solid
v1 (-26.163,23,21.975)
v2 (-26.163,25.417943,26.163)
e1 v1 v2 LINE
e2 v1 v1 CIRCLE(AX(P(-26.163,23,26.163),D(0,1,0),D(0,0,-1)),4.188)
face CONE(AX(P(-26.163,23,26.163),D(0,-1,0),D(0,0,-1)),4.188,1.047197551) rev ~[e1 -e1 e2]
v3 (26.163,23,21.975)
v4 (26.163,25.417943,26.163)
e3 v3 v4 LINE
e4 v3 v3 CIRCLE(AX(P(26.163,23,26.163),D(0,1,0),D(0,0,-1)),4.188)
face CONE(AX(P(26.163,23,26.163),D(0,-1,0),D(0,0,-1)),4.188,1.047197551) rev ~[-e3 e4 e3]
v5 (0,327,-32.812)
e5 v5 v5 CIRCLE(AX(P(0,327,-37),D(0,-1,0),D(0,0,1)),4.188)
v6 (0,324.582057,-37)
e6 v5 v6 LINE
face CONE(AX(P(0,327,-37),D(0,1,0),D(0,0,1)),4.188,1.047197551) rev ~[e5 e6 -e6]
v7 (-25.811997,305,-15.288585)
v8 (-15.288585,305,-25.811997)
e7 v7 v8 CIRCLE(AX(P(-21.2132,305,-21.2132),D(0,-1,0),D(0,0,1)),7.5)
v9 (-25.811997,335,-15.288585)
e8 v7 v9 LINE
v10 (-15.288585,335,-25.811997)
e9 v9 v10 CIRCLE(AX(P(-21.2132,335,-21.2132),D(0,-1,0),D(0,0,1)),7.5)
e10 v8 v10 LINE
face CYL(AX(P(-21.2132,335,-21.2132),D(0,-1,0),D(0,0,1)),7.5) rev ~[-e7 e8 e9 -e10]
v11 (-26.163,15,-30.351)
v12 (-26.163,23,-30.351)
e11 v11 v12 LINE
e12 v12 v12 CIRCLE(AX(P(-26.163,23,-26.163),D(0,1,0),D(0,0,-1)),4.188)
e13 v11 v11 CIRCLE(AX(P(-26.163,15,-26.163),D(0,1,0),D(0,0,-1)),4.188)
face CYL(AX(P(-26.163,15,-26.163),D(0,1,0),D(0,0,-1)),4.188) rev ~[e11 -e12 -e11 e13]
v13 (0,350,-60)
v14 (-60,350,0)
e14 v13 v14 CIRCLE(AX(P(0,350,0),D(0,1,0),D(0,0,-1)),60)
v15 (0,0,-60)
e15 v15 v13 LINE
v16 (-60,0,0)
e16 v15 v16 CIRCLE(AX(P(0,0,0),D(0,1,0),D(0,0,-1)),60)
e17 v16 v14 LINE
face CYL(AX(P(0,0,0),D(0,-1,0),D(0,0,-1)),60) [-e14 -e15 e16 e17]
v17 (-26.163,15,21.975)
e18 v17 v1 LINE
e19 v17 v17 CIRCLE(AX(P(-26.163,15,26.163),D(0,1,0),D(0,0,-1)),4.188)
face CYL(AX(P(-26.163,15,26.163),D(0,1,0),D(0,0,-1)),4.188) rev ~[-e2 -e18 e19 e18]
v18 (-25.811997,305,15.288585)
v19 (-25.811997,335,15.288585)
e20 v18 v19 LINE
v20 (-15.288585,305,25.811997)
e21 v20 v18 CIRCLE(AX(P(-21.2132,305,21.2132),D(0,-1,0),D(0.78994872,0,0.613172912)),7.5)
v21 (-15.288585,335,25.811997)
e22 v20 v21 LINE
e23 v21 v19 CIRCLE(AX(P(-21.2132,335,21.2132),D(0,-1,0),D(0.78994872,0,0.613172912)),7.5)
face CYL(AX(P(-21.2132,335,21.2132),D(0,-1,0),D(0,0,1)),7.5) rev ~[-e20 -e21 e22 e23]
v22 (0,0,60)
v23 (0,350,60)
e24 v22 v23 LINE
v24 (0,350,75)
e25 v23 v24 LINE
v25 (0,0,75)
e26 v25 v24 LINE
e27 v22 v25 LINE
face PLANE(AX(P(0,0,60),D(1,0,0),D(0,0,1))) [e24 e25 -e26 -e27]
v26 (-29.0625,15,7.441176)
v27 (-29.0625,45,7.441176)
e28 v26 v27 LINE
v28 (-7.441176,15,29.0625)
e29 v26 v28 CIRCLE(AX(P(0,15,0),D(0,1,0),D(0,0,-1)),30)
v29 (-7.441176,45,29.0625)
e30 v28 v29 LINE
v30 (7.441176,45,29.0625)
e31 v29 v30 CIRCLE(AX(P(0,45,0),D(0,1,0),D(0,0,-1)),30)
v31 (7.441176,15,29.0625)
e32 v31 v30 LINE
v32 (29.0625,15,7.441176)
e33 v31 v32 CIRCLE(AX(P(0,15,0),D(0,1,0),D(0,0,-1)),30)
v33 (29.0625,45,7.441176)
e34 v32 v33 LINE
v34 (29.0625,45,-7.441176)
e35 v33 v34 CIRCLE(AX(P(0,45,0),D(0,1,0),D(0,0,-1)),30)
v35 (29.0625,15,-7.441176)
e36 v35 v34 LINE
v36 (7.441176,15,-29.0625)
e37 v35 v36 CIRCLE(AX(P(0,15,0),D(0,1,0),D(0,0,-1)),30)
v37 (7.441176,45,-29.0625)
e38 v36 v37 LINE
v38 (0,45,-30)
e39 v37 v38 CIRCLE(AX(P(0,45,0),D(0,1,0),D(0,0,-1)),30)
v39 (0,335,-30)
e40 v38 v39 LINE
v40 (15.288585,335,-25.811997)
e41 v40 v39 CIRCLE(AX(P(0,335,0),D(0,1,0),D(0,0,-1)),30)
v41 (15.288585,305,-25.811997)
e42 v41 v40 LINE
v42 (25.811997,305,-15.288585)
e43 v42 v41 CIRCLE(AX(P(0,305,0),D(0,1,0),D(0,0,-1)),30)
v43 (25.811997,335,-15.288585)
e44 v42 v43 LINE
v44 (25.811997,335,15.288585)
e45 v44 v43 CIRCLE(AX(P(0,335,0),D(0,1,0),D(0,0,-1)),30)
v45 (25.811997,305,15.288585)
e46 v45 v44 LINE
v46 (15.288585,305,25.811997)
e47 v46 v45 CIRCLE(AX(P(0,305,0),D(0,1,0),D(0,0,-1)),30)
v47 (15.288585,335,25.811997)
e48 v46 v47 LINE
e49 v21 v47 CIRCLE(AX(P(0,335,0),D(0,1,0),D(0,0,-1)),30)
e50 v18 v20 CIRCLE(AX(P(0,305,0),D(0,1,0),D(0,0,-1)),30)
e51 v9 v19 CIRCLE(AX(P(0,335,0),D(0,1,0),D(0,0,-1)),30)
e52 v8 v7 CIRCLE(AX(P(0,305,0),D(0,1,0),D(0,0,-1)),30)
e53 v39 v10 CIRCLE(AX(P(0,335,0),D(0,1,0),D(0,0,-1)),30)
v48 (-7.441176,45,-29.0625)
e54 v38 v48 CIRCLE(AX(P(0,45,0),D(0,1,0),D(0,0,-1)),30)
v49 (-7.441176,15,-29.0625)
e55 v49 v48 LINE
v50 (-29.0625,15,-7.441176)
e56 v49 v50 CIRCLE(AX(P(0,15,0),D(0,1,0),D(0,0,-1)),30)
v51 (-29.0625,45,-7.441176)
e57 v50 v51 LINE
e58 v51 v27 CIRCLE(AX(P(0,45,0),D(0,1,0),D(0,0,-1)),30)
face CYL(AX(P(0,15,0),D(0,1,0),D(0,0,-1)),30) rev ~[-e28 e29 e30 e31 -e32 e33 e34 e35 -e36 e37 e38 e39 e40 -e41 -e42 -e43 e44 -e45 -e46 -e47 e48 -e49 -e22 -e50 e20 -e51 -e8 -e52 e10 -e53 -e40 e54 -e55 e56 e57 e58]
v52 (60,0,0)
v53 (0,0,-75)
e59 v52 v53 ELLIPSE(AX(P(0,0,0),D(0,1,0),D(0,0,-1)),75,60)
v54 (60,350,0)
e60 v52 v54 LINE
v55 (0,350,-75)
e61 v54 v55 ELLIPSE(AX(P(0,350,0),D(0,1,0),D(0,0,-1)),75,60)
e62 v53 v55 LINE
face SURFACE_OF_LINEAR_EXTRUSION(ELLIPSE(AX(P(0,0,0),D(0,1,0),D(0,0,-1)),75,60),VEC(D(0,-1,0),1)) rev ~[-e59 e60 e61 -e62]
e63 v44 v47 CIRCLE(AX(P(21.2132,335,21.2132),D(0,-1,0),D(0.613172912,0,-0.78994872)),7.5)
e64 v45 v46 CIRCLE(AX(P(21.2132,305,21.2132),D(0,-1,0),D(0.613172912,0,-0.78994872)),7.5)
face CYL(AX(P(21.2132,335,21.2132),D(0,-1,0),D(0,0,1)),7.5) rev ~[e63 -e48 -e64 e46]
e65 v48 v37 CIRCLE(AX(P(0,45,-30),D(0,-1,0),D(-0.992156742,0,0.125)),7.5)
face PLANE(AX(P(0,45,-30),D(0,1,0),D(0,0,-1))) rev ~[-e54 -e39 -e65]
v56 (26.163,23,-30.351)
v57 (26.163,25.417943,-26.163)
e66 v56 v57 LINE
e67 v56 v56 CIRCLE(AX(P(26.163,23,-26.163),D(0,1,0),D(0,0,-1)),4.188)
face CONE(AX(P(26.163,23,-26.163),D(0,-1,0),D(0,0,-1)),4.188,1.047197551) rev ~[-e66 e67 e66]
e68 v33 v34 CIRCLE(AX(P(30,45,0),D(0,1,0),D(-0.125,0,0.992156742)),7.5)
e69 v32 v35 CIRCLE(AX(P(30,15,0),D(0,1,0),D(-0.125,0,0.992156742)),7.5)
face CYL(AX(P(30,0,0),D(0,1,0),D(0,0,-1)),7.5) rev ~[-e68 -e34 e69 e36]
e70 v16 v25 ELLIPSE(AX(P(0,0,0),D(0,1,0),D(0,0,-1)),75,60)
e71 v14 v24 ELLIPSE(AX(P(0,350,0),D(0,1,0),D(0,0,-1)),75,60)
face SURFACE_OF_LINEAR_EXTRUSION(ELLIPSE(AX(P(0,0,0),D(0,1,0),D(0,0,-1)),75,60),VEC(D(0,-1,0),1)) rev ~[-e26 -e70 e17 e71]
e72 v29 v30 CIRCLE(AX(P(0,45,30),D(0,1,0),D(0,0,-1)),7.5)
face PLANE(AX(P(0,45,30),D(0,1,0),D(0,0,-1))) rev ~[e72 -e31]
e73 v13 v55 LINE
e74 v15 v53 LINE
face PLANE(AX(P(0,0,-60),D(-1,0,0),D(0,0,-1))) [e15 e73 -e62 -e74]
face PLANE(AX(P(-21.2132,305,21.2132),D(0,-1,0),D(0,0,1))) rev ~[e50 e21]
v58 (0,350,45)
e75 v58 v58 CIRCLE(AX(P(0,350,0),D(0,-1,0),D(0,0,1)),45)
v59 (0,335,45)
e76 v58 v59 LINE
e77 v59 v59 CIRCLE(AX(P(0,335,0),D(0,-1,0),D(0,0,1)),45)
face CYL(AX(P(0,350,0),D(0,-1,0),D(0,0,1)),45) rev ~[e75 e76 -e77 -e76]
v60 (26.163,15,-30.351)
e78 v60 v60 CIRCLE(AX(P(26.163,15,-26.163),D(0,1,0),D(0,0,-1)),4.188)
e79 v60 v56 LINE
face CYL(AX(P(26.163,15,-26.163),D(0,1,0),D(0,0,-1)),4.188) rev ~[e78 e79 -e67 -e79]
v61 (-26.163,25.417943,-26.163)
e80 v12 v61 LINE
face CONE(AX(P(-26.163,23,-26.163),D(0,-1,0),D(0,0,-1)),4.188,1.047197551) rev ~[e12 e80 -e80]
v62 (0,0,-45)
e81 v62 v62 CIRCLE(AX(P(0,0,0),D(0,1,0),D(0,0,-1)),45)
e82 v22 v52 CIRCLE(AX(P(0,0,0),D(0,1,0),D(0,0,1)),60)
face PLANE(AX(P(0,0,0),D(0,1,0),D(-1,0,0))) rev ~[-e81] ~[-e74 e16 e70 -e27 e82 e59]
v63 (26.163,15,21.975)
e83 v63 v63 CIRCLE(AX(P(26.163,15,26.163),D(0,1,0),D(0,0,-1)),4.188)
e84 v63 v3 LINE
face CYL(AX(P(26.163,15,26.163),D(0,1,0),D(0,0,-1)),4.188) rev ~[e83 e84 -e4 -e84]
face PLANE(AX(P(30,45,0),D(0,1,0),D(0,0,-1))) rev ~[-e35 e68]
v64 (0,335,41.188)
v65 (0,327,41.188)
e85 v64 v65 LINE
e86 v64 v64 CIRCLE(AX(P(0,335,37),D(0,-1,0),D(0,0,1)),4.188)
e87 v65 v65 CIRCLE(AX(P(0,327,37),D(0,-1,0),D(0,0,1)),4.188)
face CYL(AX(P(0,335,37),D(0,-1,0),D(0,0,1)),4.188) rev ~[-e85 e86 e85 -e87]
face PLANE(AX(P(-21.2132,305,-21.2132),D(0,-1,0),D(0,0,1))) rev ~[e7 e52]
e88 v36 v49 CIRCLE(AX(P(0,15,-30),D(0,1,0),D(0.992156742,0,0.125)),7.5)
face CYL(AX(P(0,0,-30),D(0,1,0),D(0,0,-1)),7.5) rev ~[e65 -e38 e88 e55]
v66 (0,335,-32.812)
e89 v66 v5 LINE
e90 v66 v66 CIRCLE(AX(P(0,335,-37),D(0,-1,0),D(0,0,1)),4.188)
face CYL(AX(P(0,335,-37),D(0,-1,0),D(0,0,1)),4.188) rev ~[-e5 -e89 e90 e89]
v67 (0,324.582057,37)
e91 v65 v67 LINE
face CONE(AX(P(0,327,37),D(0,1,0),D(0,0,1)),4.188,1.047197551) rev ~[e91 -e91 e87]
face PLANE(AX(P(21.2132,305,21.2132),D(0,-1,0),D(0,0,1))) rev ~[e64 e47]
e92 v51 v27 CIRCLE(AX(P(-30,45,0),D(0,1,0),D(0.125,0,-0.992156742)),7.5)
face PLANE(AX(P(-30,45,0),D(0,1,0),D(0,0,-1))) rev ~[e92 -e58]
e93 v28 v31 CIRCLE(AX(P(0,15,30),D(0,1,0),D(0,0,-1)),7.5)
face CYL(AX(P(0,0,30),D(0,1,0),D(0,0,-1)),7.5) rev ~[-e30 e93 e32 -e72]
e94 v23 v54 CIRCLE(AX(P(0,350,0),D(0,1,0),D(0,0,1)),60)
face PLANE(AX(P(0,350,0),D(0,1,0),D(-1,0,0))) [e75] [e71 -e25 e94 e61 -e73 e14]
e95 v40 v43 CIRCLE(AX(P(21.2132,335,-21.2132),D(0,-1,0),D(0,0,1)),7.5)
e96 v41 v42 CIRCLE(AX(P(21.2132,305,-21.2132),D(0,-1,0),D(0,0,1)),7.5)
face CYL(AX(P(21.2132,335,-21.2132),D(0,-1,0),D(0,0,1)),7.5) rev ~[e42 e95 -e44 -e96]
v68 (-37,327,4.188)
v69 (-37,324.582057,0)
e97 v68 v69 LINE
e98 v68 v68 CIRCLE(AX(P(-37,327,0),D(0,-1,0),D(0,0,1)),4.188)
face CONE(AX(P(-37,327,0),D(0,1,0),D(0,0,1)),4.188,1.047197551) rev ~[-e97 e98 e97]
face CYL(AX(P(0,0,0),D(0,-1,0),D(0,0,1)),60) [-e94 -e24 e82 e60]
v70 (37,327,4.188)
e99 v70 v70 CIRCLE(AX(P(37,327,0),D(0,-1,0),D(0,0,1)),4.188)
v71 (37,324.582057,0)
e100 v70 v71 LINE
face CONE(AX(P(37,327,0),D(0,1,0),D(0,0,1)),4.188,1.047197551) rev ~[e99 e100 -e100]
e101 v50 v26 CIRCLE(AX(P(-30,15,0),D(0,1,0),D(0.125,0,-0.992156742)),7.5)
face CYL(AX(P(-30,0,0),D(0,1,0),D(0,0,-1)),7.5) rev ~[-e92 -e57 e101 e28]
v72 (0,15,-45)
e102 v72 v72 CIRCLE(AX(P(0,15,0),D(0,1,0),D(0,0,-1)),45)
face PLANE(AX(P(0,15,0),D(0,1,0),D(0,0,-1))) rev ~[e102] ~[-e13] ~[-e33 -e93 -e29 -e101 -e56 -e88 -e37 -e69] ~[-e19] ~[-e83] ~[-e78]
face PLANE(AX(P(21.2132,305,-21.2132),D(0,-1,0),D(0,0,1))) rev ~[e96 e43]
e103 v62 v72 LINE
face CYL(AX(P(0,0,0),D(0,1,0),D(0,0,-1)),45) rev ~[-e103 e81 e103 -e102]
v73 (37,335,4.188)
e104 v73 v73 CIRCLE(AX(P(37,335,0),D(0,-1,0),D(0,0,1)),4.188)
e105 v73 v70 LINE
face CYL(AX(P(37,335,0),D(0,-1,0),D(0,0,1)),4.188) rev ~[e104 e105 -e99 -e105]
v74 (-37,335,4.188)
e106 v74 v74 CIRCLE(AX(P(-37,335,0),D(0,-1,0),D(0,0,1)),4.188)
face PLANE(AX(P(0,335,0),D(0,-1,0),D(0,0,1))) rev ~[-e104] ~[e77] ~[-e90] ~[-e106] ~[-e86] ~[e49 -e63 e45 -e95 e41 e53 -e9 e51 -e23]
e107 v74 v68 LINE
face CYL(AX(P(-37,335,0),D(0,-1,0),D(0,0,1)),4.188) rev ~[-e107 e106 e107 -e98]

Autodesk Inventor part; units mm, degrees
ref_plane "YZ Plane" through (0, 0, 0) normal (1, 0, 0) x (0, 1, 0)
ref_plane "XZ Plane" through (0, 0, 0) normal (0, 1, 0) x (-1, 0, 0)
ref_plane "XY Plane" through (0, 0, 0) normal (0, 0, 1) x (1, 0, 0)
sketch "Эскиз1" plane through (0, 0, 0) normal (0, 1, 0) x (-1, 0, 0)
  line L0 (0, 60) -> (0, 75)
  line L1 (0, -60) -> (0, -75)
  ellipse E0 centre (0, 0) end of major axis (0, -75) minor radius 60 (60, 0) -> (0, 75) ccw
  ellipse E1 centre (0, 0) end of major axis (0, -75) minor radius 60 (-60, 0) -> (0, -75) ccw
  arc A0 (0, 60) -> (-60, 0) centre (0, 0) ccw
  arc A1 (0, -60) -> (60, 0) centre (0, 0) ccw
  circle A2 centre (0, 0) radius 30
  dimension "d1" = 75
  dimension "d2" = 75
  dimension "d5" = 60
extrude "Выдавливание1" add sketch "Эскиз1" along normal blind 350 contours L0 E0 A1 L1 E1 A0 | A2
sketch "Эскиз2" plane through (0, 0, 0) normal (0, -1, 0) x (1, 0, 0)
  ellipse E0 centre (0, 0) end of major axis (0, -75) minor radius 60 (0, 75) -> (-60, 0) ccw projected
  line L0 (0, 75) -> (0, 0)
  circle A0 centre (0, 0) radius 30
  line L1 (0, -75) -> (0, -60) projected
  line L2 (0, 0) -> (0, -75)
  line L3 (0, 0) -> (26.5165, -26.5165)
  line L4 (0, 0) -> (37.5, 0) construction
  line L5 (0, 0) -> (-26.5165, -26.5165)
  line L6 (0, 0) -> (37.5, 0) construction
  line L7 (0, 0) -> (-26.5165, 26.5165)
  line L8 (0, 0) -> (37.5, 0) construction
  line L9 (0, 0) -> (26.5165, 26.5165)
  line L10 (0, 0) -> (37.5, 0) construction
  circle A1 centre (26.5165, 26.5165) radius 5
  circle A2 centre (26.5165, -26.5165) radius 5
  circle A3 centre (-26.5165, 26.5165) radius 5
  circle A4 centre (-26.5165, -26.5165) radius 5
  circle A5 centre (0, 0) radius 45
  line L11 (0, 0) -> (30, 0)
  circle A6 centre (30, 0) radius 5
  line L12 (0, 0) -> (0, -30)
  circle A7 centre (0, -30) radius 5
  line L13 (0, 0) -> (-30, 0)
  circle A8 centre (-30, 0) radius 5
  line L14 (0, 0) -> (0, 30)
  circle A9 centre (0, 30) radius 5
  dimension "d13" = 60
  dimension "d14" = 37.5
  dimension "d15" = 45
  dimension "d16" = 37.5
  dimension "d17" = 135
  dimension "d18" = 37.5
  dimension "d19" = 135
  dimension "d20" = 37.5
  dimension "d21" = 45
  dimension "d22" = 10
  dimension "d23" = 10
  dimension "d24" = 10
  dimension "d25" = 10
  dimension "d26" = 90
  dimension "d30" = 30
  dimension "d31" = 30
  dimension "d32" = 30
  dimension "d33" = 30
hole "Отверстие1" at (0, 0, 0) direction (0, 1, 0) diameter 60 end through all counterbore diameter 90 counterbore depth 15
sketch "Эскиз3" plane through (0, 0, 0) normal (0, -1, 0) x (1, 0, 0)
  line L0 (0, 0) -> (30, 0)
  circle A0 centre (30, 0) radius 5
  line L1 (0, 0) -> (0, -30)
  circle A1 centre (0, 0) radius 30 projected
  circle A2 centre (0, -30) radius 5
  line L2 (0, 0) -> (-30, 0)
  line L3 (0, 0) -> (0, 30)
  circle A3 centre (0, 30) radius 5
  circle A4 centre (-30, 0) radius 5
  dimension "d34" = 30
  dimension "d35" = 10
  dimension "d36" = 10
  dimension "d37" = 10
  dimension "d38" = 10
hole "Отверстие2" at (0, 0, 30) at (-30, 0, 0) at (0, 0, -30) at (30, 0, 0) direction (0, 1, 0) diameter 15 depth 45
sketch "Эскиз5" plane through (0, 350, 0) normal (0, 1, 0) x (1, 0, 0)
  circle A0 centre (0, 0) radius 45
hole "Отверстие4" at (0, 350, 0) direction (0, -1, 0) diameter 90 depth 15
sketch "Эскиз6" plane through (0, 335, 0) normal (0, 1, 0) x (1, 0, 0)
  line L0 (0, 0) -> (0, -37.5)
  line L1 (0, 0) -> (-37.5, 0)
  line L2 (0, 0) -> (0, 37.5)
  line L3 (0, 0) -> (37.5, 0)
  line L4 (0, 0) -> (-21.2132, -21.2132)
  line L5 (0, 0) -> (30, 0) construction
  line L6 (0, 0) -> (21.2132, -21.2132)
  line L7 (0, 0) -> (30, 0) construction
  line L8 (0, 0) -> (-21.2132, 21.2132)
  line L9 (0, 0) -> (30, 0) construction
  line L10 (0, 0) -> (21.2132, 21.2132)
  line L11 (0, 0) -> (30, 0) construction
  circle A0 centre (21.2132, -21.2132) radius 7.5
  circle A1 centre (-21.2132, -21.2132) radius 7.5
  circle A2 centre (-21.2132, 21.2132) radius 7.5
  circle A3 centre (21.2132, 21.2132) radius 7.5
  circle A4 centre (37.5, 0) radius 5
  circle A5 centre (0, -37.5) radius 5
  circle A6 centre (-37.5, 0) radius 5
  circle A7 centre (0, 37.5) radius 5
  dimension "d71" = 37.5
  dimension "d72" = 37.5
  dimension "d73" = 37.5
  dimension "d74" = 37.5
  dimension "d75" = 30
  dimension "d76" = 135
  dimension "d77" = 30
  dimension "d78" = 45
  dimension "d79" = 30
  dimension "d80" = 135
  dimension "d81" = 30
  dimension "d82" = 45
  dimension "d83" = 15
  dimension "d84" = 15
  dimension "d85" = 15
  dimension "d86" = 15
  dimension "d87" = 10
  dimension "d88" = 10
  dimension "d89" = 10
  dimension "d90" = 10
hole "Отверстие5" at (21.2132, 335, 21.2132) at (-21.2132, 335, 21.2132) at (-21.2132, 335, -21.2132) at (21.2132, 335, -21.2132) direction (0, -1, 0) diameter 15 depth 30
sketch "Эскиз8" plane through (0, 335, 0) normal (0, 1, 0) x (1, 0, 0)
  point P0 (37, 0)
  point P1 (0, -37)
  point P2 (-37, 0)
  point P3 (0, 37)
hole "Отверстие7" at (37, 335, 0) at (0, 335, 37) at (-37, 335, 0) at (0, 335, -37) direction (0, -1, 0) diameter 8.376 depth 8 tip angle 120 thread size "M10x1.5" class "6H" standard "ISO Metric profile"
sketch "Эскиз9" plane through (0, 15, 0) normal (0, -1, 0) x (1, 0, 0)
  point P0 (26.163, 26.163)
  point P1 (26.163, -26.163)
  point P2 (-26.163, -26.163)
  point P3 (-26.163, 26.163)
hole "Отверстие8" at (26.163, 15, 26.163) at (26.163, 15, -26.163) at (-26.163, 15, -26.163) at (-26.163, 15, 26.163) direction (0, 1, 0) diameter 8.376 depth 8 tip angle 120 thread size "M10x1.5" class "6H" standard "ISO Metric profile"
properties material "Сталь, литейная"
